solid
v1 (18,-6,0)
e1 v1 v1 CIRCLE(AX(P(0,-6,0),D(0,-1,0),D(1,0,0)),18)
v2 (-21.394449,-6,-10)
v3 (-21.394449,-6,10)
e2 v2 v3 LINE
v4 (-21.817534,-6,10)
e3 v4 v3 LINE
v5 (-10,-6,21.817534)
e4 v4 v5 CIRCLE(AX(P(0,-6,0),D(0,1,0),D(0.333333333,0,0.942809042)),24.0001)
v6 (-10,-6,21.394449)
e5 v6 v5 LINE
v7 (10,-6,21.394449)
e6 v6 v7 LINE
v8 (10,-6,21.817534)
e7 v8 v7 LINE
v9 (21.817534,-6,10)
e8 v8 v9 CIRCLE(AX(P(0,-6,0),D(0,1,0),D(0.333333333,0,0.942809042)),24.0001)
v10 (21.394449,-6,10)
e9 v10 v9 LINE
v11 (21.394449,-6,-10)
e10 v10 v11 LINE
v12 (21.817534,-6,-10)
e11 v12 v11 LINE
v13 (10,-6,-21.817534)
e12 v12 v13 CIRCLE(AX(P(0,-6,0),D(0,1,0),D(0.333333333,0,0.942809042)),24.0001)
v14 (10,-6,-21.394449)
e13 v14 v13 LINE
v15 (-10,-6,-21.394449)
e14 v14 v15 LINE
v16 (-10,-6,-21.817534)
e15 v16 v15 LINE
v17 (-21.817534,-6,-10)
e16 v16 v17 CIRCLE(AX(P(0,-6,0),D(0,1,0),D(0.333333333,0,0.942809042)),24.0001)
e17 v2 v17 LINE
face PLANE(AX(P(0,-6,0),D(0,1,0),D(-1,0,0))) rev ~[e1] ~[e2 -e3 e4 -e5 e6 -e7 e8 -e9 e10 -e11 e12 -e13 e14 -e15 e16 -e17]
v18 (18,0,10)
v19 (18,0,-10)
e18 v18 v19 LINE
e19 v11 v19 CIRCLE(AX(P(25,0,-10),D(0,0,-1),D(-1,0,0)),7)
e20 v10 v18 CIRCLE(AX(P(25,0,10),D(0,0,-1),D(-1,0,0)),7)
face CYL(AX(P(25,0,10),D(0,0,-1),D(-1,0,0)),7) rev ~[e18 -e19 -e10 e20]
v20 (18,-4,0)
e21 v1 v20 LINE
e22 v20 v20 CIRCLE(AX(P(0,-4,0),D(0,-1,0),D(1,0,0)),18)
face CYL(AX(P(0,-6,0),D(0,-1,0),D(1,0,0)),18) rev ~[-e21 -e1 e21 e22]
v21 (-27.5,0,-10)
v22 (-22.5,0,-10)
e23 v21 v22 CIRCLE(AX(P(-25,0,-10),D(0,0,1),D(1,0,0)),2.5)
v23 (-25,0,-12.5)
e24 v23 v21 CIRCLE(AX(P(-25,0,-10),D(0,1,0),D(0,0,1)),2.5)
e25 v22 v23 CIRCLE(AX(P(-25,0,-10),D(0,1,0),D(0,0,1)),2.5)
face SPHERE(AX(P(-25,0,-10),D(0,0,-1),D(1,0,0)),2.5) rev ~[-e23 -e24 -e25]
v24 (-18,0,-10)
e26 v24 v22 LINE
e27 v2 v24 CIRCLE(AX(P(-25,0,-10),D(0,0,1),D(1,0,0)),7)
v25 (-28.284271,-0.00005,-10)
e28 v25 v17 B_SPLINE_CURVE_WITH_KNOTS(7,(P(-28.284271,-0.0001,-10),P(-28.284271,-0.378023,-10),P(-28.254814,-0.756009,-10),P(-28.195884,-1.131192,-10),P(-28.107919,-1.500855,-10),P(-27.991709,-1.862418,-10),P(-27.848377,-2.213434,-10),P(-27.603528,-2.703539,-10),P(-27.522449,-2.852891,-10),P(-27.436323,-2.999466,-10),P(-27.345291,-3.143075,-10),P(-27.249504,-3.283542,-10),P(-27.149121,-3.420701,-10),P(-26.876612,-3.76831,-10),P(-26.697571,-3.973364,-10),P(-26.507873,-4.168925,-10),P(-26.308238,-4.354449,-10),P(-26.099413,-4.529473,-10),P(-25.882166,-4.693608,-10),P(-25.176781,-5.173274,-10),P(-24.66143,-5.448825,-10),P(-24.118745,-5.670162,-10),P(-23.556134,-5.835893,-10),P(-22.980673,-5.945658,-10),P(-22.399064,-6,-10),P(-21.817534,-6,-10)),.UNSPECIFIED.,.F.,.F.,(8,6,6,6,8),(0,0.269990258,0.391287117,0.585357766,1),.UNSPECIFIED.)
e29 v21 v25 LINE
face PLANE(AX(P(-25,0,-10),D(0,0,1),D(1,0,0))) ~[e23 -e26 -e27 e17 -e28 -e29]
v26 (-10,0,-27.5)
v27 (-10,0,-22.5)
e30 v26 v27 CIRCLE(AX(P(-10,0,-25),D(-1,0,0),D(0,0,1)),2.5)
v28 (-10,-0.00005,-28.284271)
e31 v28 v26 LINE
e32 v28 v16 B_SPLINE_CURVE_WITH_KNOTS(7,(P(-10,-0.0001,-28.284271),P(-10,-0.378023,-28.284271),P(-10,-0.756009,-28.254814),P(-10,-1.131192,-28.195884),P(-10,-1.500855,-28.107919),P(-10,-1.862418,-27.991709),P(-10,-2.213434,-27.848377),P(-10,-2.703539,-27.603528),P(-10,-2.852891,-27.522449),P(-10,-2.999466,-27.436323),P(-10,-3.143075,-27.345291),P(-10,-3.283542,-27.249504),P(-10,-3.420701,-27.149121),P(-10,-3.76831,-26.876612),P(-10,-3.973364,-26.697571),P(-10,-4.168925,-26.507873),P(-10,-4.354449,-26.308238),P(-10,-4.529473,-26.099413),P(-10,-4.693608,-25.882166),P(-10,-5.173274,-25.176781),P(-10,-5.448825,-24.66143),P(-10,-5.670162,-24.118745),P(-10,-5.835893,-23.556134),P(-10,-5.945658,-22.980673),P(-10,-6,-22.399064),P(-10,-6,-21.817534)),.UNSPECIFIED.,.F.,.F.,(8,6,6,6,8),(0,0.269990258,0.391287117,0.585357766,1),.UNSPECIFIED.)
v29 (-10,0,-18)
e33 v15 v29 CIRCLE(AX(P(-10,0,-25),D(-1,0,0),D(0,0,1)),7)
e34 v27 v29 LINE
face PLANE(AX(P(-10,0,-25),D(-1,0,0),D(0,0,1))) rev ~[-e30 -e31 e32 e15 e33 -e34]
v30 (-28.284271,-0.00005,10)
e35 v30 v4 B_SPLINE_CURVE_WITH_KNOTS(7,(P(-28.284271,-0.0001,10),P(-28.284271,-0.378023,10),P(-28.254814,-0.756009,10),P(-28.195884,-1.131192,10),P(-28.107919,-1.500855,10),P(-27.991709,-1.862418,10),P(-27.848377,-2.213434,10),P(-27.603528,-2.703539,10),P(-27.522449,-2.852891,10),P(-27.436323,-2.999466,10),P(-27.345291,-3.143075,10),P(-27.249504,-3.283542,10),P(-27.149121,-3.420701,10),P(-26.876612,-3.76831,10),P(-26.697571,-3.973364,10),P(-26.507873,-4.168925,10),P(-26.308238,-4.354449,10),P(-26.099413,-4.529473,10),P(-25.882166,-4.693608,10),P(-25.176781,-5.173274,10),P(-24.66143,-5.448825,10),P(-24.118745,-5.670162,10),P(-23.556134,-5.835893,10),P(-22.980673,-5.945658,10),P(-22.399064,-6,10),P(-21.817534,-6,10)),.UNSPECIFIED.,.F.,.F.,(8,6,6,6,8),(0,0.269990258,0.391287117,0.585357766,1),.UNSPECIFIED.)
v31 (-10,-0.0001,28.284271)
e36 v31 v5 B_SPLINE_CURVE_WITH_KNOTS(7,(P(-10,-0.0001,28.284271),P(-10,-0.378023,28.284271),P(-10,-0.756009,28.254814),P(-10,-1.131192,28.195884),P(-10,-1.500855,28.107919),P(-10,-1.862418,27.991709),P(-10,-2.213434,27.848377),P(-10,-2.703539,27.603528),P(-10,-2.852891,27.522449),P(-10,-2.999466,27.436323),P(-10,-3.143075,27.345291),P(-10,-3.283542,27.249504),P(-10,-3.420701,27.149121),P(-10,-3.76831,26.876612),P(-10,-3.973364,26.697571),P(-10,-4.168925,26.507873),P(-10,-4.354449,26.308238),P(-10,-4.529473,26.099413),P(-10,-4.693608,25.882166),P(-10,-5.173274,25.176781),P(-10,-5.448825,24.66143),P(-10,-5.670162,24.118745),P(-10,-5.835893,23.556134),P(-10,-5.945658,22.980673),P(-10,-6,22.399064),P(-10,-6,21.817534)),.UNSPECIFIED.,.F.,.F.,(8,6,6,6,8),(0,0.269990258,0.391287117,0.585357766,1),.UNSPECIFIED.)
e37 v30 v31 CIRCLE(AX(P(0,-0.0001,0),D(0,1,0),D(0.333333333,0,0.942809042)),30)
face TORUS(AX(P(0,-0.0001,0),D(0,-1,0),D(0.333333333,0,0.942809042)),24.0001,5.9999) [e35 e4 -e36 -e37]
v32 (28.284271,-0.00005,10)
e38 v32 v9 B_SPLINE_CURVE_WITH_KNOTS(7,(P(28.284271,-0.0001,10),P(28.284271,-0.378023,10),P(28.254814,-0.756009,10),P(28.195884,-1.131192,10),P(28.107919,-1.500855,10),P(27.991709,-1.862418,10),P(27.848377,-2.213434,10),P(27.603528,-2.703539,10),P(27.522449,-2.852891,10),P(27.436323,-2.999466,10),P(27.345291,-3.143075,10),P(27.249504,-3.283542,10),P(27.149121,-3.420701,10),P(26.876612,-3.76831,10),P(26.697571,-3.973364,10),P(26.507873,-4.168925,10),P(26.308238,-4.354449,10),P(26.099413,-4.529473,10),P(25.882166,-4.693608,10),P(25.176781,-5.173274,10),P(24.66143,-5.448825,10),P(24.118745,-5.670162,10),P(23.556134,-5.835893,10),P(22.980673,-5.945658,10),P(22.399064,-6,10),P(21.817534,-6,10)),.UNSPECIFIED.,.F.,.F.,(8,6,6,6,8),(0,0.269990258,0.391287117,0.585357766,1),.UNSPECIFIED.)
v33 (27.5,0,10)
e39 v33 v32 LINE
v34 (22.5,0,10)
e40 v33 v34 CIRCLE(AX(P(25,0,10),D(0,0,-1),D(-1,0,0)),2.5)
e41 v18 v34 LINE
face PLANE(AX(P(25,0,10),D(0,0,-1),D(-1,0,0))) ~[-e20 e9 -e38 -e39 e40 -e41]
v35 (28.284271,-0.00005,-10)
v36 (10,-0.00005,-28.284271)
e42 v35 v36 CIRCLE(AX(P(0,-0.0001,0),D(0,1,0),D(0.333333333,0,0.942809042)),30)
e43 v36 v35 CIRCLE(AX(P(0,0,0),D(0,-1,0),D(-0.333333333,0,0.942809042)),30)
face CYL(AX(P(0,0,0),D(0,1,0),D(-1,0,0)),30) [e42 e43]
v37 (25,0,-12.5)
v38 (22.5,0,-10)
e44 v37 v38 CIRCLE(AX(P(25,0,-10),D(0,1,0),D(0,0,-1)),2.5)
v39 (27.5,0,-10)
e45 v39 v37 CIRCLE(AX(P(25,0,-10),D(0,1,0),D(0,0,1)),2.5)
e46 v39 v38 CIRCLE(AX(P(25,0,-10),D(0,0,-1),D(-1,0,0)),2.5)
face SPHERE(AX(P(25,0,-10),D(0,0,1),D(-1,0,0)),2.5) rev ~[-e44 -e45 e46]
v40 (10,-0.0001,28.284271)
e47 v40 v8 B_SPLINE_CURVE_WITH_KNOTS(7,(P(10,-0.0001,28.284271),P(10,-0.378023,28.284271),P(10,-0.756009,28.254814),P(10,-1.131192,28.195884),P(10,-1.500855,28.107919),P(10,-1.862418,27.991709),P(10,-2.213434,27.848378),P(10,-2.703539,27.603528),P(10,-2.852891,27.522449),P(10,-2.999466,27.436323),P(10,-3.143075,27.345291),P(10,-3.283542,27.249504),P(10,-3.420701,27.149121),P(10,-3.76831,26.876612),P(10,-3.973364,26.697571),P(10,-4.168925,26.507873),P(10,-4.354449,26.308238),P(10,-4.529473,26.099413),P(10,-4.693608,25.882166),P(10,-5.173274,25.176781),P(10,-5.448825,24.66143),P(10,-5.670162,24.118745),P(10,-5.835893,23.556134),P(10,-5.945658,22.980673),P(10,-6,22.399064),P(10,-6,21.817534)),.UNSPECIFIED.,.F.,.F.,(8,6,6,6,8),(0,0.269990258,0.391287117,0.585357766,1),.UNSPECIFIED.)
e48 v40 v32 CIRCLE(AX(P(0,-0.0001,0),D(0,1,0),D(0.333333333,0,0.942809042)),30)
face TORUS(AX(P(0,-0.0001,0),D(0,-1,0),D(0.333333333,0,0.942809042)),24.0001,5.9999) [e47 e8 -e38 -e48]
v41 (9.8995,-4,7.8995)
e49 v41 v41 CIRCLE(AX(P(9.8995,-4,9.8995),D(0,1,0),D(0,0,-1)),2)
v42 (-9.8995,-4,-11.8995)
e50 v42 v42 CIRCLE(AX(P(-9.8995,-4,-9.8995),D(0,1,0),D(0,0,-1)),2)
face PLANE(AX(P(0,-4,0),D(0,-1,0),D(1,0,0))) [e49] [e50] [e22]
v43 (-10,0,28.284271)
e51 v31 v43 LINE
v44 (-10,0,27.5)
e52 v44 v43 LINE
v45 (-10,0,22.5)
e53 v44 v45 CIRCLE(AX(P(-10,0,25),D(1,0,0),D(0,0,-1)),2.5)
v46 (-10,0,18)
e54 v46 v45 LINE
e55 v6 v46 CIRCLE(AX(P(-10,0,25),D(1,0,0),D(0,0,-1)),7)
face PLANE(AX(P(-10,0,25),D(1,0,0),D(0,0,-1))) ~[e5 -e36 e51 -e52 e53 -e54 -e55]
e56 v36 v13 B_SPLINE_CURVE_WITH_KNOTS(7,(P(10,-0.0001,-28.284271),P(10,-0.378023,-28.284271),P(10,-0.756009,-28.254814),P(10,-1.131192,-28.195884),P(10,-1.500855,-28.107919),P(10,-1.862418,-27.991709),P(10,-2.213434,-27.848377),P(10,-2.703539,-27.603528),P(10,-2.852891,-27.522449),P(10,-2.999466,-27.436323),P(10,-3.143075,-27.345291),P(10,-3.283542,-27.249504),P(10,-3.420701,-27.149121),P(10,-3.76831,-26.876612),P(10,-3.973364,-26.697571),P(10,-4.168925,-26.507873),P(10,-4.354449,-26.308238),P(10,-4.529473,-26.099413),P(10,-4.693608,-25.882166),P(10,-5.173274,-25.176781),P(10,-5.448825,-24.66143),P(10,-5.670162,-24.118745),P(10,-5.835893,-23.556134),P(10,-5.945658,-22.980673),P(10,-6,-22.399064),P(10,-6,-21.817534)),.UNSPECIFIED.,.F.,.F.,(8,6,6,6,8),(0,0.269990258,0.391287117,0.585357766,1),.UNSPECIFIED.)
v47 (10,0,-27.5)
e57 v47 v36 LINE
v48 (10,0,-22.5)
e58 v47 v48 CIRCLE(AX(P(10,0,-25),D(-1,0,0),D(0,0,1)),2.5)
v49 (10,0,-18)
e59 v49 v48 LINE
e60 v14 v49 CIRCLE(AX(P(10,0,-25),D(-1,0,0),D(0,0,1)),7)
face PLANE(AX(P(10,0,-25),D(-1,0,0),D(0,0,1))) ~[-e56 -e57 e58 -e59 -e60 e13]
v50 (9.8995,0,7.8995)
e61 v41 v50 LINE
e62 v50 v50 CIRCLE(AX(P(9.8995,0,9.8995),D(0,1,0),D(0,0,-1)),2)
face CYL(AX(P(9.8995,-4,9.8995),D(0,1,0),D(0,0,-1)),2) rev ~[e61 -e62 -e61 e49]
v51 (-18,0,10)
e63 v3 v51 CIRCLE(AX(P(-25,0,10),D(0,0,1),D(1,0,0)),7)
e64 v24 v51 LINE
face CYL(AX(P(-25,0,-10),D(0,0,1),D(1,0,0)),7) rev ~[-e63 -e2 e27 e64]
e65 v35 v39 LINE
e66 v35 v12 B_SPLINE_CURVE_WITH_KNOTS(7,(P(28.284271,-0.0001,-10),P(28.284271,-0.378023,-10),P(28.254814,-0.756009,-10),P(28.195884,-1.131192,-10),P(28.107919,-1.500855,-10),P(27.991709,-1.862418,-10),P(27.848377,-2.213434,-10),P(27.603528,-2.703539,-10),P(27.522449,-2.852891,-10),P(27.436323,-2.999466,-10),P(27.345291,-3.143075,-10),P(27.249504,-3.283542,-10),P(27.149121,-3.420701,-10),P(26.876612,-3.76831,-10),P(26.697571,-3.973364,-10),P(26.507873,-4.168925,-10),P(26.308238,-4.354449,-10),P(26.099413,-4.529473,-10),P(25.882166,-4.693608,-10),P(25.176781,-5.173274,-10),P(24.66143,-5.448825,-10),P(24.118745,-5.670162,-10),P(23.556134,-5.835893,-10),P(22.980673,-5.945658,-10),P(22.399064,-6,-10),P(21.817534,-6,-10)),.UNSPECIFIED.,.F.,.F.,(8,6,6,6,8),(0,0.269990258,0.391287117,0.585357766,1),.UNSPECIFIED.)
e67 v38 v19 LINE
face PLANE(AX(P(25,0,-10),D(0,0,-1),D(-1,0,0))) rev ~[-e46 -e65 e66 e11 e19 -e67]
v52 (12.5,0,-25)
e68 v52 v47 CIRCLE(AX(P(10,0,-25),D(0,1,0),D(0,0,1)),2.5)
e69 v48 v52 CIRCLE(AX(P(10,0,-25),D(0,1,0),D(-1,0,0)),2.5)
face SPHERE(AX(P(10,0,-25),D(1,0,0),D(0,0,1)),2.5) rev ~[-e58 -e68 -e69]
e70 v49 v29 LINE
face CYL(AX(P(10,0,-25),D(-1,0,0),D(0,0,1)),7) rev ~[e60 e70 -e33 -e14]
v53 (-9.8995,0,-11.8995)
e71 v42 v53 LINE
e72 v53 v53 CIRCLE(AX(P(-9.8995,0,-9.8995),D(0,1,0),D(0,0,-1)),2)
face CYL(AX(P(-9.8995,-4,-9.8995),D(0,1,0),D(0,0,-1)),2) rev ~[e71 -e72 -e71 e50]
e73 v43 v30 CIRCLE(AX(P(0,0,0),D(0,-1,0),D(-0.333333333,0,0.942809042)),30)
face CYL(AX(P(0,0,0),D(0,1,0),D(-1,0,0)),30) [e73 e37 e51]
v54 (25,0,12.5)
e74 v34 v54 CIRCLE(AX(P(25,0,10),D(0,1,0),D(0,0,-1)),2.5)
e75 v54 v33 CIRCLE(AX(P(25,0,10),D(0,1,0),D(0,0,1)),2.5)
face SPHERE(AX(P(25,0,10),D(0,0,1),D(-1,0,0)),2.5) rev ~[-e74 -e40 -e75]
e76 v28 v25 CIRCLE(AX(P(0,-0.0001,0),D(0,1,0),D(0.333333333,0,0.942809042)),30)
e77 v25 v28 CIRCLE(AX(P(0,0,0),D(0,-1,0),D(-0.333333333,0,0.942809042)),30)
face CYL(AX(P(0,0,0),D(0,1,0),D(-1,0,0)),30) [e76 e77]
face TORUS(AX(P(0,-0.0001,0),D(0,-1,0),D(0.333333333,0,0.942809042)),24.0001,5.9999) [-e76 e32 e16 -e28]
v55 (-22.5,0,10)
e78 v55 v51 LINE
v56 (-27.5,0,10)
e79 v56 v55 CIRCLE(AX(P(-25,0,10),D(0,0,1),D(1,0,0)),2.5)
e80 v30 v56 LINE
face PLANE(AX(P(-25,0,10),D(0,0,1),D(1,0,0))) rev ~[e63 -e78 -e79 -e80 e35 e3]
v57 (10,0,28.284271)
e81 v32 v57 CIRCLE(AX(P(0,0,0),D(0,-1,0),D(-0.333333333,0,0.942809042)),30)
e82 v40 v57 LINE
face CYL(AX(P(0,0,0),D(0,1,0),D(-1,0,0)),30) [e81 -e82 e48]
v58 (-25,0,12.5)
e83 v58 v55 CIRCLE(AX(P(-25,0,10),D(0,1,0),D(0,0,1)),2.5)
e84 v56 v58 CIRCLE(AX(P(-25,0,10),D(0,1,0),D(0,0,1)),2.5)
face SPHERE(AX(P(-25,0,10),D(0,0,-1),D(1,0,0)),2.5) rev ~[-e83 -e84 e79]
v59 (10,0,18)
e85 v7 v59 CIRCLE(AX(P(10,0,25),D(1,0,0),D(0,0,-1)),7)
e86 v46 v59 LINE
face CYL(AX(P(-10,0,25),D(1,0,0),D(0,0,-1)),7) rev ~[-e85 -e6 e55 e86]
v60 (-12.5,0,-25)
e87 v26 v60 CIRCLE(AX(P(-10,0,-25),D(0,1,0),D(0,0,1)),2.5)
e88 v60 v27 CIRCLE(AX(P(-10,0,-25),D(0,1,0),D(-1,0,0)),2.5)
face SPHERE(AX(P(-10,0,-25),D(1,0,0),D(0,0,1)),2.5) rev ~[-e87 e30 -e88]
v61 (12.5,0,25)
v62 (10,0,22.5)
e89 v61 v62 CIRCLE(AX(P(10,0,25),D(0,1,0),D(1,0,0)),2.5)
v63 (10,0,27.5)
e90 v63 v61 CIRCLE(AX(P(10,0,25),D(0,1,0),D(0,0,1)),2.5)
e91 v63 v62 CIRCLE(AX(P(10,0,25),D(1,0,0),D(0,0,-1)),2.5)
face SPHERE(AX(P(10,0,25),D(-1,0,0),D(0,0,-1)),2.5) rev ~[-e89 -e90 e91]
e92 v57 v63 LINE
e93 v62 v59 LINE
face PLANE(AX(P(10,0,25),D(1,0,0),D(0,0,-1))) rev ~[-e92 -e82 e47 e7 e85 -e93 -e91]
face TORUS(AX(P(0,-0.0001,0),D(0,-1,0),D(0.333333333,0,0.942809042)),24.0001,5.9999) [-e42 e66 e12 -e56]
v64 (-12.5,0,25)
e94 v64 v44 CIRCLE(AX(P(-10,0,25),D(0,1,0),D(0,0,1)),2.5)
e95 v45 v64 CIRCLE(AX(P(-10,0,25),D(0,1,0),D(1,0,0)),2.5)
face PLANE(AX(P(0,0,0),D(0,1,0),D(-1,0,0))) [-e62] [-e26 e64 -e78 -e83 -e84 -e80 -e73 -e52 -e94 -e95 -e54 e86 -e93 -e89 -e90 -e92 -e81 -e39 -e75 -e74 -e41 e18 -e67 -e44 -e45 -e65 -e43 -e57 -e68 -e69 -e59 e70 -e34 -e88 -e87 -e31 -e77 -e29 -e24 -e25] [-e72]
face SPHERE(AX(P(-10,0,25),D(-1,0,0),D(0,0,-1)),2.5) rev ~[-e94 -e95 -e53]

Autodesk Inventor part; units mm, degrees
ref_plane "YZ Plane" through (0, 0, 0) normal (1, 0, 0) x (0, 1, 0)
ref_plane "XZ Plane" through (0, 0, 0) normal (0, 1, 0) x (-1, 0, 0)
ref_plane "XY Plane" through (0, 0, 0) normal (0, 0, 1) x (1, 0, 0)
sketch "Sketch1" plane through (0, 0, 0) normal (0, 1, 0) x (-1, 0, 0)
  circle A0 centre (0, 0) radius 30
  dimension "d0" = 60
extrude "Extrusion1" add sketch "Sketch1" against normal blind 6
sketch "Sketch2" plane through (0, 0, 0) normal (0, 1, 0) x (1, 0, 0)
  line L0 (-10, -18) -> (10, -18)
  line L1 (10, -32) -> (-10, -32)
  line L2 (-10, -18) -> (10, -32) construction
  line L3 (10, -18) -> (-10, -32) construction
  arc A0 (-7.5, -25) -> (-12.5, -25) centre (-10, -25) ccw
  arc A1 (12.5, -25) -> (7.5, -25) centre (10, -25) ccw
  line L4 (-12.5, -25) -> (12.5, -25)
  line L5 (-10, -32) -> (-10, -27.5)
  line L6 (-10, -25) -> (-10, -18)
  line L7 (10, -18) -> (10, -25)
  line L8 (10, -27.5) -> (10, -32)
  point P0 (0, 0)
  point P1 (0, -25)
  dimension "d3" = 20
  dimension "d4" = 25
  dimension "d5" = 14
  dimension "d6" = 5
  dimension "d7" = 5
revolve "Revolution1" cut sketch "Sketch2" angle 360 about axis through (-12.5, 0, 25) along (1, 0, 0)
sketch "Sketch3" plane through (0, -6, 0) normal (0, -1, 0) x (1, 0, 0)
  arc A0 (9.04, 28.6056) -> (-9.04, 28.6056) centre (0, 0) ccw projected
  line L0 (-9.04, 28.6056) -> (9.04, 28.6056) projected
  arc A1 (9.04, 28.6056) -> (-9.04, 28.6056) centre (0, 0) ccw projected
extrude "Extrusion2" cut sketch "Sketch3" against normal through all
fillet "Fillet1" radius 6 1 edges at (0, -6, -30)
pattern_circular "Circular Pattern1" count 4 over 360 about axis through (0, -10, 0) along (0, 1, 0) of "Revolution1"
sketch "Sketch4" plane through (0, -6, 0) normal (0, -1, 0) x (1, 0, 0)
  circle A0 centre (0, 0) radius 18
  dimension "d15" = 36
extrude "Extrusion3" cut sketch "Sketch4" against normal blind 2
sketch "Sketch5" plane through (0, -4, 0) normal (0, -1, 0) x (1, 0, 0)
  circle A0 centre (0, 0) radius 18 projected
  line L0 (0, 0) -> (18, 0)
  line L1 (0, 0) -> (9.8995, 9.8995)
  line L2 (0, 0) -> (-9.8995, -9.8995)
  dimension "d19" = 45
  dimension "d20" = 14
  dimension "d21" = 14
  dimension "d22" = 180
hole "Hole1" at (9.8995, -4, 9.8995) at (-9.8995, -4, -9.8995) direction (0, 1, 0) diameter 4 end through all
properties part number "wheel_cover_in"
